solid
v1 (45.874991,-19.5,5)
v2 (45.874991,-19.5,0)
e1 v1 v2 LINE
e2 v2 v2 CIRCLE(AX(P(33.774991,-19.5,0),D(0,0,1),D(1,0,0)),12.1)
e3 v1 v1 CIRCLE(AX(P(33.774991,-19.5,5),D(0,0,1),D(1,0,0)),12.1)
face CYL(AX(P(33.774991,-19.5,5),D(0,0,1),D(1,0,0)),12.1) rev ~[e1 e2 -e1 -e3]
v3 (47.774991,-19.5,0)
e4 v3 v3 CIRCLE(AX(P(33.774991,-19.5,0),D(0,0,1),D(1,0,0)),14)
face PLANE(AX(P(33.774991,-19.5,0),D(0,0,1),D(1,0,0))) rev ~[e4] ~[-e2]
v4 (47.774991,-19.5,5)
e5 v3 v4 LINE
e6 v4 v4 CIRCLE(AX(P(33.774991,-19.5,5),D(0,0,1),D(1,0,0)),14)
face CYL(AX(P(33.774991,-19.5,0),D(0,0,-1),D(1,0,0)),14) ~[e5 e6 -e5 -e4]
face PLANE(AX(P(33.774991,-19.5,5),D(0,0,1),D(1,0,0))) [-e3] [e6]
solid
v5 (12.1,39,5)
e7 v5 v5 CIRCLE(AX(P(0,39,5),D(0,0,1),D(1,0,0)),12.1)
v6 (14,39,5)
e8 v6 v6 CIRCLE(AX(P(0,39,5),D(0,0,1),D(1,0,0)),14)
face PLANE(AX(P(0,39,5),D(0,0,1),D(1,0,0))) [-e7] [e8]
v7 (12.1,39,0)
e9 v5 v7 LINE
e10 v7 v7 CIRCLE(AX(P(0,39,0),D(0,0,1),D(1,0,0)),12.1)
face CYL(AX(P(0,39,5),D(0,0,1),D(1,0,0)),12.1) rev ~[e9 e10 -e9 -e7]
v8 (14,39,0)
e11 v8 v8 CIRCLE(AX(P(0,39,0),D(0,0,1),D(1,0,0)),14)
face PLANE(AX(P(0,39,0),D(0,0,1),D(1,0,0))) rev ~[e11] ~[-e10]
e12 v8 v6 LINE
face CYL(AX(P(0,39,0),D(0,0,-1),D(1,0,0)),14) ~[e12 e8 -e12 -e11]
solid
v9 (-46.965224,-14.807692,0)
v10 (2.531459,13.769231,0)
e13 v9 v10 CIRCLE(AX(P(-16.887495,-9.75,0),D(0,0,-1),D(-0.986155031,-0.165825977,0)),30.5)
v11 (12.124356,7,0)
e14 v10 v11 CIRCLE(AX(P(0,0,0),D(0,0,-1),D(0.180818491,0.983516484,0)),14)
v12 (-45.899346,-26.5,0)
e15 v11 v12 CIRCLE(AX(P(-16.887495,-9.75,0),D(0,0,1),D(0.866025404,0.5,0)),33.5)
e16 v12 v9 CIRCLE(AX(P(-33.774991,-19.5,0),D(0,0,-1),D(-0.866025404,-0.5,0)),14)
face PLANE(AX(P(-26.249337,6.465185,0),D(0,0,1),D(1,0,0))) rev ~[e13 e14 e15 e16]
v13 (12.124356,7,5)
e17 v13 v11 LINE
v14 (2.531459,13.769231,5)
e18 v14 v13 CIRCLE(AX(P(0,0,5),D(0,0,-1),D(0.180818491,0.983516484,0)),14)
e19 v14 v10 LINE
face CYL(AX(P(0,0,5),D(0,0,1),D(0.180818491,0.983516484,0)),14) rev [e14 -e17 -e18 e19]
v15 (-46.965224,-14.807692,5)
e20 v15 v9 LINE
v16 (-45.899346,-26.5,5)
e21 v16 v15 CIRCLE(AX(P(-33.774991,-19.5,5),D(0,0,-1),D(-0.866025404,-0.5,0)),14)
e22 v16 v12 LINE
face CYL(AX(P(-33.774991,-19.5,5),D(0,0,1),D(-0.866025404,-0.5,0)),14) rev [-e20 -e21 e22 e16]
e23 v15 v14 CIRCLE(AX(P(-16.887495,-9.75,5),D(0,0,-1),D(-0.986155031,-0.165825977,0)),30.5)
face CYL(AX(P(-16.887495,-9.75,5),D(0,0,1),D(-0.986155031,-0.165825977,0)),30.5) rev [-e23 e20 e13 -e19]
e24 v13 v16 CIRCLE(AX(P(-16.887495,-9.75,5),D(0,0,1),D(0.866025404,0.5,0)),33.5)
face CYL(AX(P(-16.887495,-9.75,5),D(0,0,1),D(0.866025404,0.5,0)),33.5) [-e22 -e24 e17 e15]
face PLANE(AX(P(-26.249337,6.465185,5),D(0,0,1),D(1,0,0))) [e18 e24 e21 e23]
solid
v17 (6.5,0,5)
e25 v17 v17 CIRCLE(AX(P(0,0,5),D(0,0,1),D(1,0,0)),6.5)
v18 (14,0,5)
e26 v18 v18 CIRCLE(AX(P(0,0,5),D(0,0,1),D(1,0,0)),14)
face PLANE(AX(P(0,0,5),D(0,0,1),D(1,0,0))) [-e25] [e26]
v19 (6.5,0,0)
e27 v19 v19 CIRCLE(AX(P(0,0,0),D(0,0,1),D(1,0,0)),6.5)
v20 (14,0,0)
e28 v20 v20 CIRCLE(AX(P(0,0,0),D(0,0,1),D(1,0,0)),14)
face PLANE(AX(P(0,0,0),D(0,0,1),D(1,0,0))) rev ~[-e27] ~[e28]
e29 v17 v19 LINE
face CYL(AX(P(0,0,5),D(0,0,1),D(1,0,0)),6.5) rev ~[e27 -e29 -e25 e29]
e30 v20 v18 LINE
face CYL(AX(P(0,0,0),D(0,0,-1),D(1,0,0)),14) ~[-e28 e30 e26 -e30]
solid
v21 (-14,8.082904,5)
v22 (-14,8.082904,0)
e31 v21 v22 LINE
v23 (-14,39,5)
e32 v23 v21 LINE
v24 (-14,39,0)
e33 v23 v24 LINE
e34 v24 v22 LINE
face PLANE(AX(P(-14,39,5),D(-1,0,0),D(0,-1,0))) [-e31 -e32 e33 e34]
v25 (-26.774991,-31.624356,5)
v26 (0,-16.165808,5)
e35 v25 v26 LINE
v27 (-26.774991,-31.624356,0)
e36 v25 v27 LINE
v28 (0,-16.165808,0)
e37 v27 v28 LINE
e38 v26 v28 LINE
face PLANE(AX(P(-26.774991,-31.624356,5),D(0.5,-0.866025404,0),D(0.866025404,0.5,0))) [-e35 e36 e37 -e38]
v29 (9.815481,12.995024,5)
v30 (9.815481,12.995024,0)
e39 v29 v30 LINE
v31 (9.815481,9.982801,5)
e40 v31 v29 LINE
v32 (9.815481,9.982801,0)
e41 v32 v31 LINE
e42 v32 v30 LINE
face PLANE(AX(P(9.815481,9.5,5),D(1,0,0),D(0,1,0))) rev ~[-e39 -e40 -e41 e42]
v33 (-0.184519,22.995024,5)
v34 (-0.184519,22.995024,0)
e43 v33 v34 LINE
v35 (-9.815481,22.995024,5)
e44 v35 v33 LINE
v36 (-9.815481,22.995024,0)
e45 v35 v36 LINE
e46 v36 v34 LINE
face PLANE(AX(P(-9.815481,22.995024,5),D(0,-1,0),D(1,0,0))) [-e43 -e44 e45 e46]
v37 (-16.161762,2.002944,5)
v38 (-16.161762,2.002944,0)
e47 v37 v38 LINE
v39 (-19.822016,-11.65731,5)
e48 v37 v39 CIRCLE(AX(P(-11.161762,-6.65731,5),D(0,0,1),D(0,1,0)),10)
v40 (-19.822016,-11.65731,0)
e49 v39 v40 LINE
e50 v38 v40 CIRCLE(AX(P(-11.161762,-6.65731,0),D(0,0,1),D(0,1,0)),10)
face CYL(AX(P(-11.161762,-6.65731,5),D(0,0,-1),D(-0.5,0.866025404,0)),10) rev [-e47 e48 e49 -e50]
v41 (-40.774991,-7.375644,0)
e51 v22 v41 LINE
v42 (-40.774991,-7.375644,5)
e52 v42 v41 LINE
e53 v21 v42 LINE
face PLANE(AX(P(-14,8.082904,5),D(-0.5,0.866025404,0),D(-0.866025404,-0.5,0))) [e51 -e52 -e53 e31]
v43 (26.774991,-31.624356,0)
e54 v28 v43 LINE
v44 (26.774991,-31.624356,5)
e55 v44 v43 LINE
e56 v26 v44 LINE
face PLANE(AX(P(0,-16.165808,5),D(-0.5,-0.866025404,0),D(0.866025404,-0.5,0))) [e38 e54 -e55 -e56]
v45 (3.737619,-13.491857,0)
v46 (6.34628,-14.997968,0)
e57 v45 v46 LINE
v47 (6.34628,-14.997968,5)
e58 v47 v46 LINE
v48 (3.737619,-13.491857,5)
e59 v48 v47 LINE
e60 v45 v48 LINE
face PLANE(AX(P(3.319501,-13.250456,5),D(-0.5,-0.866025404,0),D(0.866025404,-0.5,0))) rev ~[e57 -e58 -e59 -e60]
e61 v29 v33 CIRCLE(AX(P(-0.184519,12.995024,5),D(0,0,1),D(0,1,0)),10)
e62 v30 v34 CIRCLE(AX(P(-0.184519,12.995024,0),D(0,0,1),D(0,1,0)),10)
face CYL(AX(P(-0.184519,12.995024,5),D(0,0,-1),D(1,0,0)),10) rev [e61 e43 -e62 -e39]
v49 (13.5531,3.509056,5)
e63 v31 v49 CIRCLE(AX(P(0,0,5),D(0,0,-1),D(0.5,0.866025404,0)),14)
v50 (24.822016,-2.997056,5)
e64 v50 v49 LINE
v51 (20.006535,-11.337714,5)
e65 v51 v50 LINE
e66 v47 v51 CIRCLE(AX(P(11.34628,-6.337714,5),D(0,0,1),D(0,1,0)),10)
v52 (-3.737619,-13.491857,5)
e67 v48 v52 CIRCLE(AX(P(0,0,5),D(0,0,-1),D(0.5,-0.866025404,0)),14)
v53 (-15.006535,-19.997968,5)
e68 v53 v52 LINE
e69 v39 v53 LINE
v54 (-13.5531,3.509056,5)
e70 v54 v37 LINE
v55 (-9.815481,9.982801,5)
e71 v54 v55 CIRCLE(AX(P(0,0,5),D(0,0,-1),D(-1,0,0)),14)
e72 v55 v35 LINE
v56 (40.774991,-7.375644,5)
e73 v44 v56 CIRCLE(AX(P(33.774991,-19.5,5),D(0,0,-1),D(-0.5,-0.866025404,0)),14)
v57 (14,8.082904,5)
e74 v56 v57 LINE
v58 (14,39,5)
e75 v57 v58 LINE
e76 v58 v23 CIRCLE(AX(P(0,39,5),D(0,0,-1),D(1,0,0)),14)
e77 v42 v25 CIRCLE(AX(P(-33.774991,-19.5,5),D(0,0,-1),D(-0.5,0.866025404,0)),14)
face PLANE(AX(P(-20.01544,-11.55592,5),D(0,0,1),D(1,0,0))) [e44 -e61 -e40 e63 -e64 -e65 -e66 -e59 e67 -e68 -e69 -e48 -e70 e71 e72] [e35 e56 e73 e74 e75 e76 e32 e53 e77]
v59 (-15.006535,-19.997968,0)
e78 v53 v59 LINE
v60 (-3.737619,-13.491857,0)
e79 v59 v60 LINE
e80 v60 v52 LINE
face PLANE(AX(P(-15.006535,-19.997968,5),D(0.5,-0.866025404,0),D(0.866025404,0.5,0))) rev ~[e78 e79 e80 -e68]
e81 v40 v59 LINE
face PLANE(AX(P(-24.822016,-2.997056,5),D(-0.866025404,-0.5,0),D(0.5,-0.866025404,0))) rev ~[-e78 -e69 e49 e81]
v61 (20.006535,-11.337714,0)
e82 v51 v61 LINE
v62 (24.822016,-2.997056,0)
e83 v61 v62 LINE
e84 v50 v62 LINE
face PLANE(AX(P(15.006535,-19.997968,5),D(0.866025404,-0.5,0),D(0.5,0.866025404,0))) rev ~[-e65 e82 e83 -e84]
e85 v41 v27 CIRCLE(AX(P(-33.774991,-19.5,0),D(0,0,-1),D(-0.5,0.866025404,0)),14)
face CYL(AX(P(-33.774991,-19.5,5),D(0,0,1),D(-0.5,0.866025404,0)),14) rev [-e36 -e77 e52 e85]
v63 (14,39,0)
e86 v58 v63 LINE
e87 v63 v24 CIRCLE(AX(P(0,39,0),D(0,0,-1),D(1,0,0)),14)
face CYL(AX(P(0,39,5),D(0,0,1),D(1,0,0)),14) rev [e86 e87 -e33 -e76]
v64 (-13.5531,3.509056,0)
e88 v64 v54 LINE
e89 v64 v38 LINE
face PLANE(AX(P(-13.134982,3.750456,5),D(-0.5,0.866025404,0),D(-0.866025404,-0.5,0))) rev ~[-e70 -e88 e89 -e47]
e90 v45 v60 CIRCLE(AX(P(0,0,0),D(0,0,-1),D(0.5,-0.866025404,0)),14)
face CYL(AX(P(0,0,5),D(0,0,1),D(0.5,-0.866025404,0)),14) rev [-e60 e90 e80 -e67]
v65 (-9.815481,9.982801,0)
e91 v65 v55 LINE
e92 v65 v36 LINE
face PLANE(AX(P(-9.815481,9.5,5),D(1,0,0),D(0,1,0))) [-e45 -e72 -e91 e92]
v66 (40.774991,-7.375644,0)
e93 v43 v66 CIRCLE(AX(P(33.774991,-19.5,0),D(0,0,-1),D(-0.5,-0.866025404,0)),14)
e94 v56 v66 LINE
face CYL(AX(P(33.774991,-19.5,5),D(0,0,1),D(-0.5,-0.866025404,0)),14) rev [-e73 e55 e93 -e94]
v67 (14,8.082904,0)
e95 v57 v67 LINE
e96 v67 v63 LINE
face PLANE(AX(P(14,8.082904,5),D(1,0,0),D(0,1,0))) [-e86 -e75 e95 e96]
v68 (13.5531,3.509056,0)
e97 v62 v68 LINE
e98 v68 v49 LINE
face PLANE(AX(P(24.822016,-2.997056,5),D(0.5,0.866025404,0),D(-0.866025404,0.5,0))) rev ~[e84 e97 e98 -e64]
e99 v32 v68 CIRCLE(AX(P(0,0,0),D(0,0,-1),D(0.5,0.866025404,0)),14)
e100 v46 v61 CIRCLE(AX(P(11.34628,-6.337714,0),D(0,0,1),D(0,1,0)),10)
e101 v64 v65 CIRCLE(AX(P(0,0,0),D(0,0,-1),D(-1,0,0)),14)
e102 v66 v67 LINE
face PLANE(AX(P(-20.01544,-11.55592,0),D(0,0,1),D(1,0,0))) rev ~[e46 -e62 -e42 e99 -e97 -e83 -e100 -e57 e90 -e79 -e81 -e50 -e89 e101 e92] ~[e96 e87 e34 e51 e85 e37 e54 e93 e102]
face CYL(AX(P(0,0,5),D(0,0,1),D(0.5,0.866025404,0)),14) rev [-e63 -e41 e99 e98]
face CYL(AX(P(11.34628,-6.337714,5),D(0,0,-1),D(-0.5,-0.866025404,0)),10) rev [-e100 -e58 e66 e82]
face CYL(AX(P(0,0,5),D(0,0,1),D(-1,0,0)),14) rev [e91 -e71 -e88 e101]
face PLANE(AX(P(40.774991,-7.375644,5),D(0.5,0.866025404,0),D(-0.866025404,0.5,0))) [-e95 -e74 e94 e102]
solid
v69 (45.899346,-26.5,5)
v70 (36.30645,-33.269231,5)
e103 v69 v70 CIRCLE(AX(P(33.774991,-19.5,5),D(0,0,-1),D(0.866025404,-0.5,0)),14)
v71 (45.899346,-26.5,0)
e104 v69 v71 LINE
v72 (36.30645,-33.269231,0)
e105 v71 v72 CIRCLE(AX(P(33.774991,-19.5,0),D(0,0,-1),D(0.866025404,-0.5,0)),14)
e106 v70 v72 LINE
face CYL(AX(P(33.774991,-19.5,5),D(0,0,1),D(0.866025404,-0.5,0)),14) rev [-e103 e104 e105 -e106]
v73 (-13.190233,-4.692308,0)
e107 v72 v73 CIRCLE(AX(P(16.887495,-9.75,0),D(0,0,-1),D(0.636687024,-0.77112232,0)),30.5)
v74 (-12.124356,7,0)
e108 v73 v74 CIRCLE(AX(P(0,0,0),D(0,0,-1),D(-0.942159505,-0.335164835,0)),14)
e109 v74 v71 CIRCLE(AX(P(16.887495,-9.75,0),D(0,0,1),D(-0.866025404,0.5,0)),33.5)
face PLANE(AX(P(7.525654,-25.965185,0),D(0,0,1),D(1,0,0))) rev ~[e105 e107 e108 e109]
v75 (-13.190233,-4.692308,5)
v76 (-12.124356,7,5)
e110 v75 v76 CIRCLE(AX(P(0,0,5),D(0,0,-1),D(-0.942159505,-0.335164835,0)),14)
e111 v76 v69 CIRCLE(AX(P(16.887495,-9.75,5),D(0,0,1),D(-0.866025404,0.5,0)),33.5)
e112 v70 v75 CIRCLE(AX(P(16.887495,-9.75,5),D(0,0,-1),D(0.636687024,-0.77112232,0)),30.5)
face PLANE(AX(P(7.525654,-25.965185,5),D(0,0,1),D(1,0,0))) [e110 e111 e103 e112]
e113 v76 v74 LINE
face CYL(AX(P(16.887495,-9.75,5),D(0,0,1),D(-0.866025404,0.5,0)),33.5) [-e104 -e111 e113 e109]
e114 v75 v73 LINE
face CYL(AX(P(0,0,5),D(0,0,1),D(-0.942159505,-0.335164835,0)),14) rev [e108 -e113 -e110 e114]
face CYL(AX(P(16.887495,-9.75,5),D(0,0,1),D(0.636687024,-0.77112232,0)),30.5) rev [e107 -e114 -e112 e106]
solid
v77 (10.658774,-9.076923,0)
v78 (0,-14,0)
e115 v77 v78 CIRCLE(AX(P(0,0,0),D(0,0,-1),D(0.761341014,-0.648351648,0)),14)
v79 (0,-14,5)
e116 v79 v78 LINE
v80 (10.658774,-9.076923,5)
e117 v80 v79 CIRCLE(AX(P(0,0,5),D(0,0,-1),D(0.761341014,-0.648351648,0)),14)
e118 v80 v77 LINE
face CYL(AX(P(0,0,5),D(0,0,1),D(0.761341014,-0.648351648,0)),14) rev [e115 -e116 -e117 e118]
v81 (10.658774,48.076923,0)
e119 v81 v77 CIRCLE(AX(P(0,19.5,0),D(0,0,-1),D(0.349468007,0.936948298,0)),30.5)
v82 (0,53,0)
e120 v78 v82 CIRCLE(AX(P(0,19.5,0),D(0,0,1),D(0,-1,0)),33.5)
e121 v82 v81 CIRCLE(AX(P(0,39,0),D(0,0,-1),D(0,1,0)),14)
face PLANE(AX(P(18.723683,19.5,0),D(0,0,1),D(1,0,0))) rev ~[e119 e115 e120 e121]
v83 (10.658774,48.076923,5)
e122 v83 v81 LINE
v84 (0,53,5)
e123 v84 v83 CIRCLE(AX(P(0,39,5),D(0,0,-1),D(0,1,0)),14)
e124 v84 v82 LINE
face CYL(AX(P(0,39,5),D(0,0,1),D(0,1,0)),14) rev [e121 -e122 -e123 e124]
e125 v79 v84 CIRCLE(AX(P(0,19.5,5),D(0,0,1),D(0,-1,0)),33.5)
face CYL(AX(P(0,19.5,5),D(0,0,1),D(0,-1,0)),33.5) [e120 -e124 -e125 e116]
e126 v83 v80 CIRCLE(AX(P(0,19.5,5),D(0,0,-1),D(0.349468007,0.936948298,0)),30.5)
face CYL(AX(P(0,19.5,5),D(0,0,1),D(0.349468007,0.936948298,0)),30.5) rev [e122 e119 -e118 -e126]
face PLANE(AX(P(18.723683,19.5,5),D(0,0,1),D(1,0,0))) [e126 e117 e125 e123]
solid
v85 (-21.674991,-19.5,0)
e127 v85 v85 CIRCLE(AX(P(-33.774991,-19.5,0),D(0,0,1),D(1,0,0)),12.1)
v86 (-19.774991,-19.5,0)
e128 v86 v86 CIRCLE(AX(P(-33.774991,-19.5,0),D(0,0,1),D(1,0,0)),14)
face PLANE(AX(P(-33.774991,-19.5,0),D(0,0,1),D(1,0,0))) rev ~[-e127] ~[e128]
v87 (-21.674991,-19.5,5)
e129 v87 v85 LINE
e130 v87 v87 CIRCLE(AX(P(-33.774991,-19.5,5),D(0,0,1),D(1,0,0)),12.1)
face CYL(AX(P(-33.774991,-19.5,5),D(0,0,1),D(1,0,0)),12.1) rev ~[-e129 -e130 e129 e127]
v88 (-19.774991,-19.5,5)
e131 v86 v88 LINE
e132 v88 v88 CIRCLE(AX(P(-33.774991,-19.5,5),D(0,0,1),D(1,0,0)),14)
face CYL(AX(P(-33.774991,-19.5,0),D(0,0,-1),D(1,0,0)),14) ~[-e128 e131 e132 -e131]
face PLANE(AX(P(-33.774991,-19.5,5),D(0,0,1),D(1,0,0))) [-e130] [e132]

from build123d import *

# Parameters (mm, degrees)
F0_R      = 14
F1_DEPTH  = 5
F2_R      = 6.5
F3_DEPTH  = 5
F4_R      = 14
F5_DEPTH  = 5
F6_R      = 12.1
F7_DEPTH  = 5
F9_DEPTH  = 5
F11_DEPTH = 5
F12_W     = 19.6309629187
F12_H     = 13.4950243425
F13_DEPTH = 25
F14_R     = 10


# Not quite as in the source:
# - a feature names something its author has since deleted; it is built from what else it names


with BuildPart() as f1:
    # F0 (on Top) → F1 (new body)
    with BuildSketch(Plane.XY):
        Circle(F0_R)
    extrude(amount=F1_DEPTH)

    # F2 (on face) → F3 (cut)
    with BuildSketch(Plane.XY.offset(5)):
        Circle(F2_R)
    extrude(amount=-F3_DEPTH, mode=Mode.SUBTRACT)


with BuildPart() as f5:
    # F4 (on Top) → F5 (new body)
    with BuildSketch(Plane.XY):
        with Locations((0, 39)):
            Circle(F4_R)
    extrude(amount=F5_DEPTH)


with BuildPart() as f5b:
    # F4 (on Top) → F5, piece 2 (new body)
    with BuildSketch(Plane.XY):
        with Locations((-33.7749907476, -19.5)):
            Circle(F4_R)
    extrude(amount=F5_DEPTH)


with BuildPart() as f5c:
    # F4 (on Top) → F5, piece 3 (new body)
    with BuildSketch(Plane.XY):
        with Locations((33.7749907476, -19.5)):
            Circle(F4_R)
    extrude(amount=F5_DEPTH)


with BuildPart() as f7_tool:
    # F6 (on face) → F7 (new body)
    with BuildSketch(Plane.XY.offset(5)):
        with Locations((0, 39)):
            Circle(F6_R)
        with Locations((-33.7749907476, -19.5)):
            Circle(F6_R)
        with Locations((33.7749907476, -19.5)):
            Circle(F6_R)
    extrude(amount=-F7_DEPTH)


with BuildPart() as f5_1:
    add(f5.part)

    # F7: cut by f7_tool
    add(f7_tool.part, mode=Mode.SUBTRACT)


with BuildPart() as f5b_1:
    add(f5b.part)

    # F7: cut by f7_tool
    add(f7_tool.part, mode=Mode.SUBTRACT)


with BuildPart() as f5c_1:
    add(f5c.part)

    # F7: cut by f7_tool
    add(f7_tool.part, mode=Mode.SUBTRACT)


with BuildPart() as f9:
    # F8 (on face) → F9 (new body)
    with BuildSketch(Plane.XY.offset(5)):
        with BuildLine():
            ThreePointArc((10.6587742004, -9.0769230769), (5.8703950856, -12.709778186), (0, -14))
            ThreePointArc((0, -14), (33.5, 19.5), (0, 53))
            ThreePointArc((0, 53), (5.8703950856, 51.709778186), (10.6587742004, 48.0769230769))
            ThreePointArc((10.6587742004, 48.0769230769), (30.5, 19.5), (10.6587742004, -9.0769230769))
        make_face()
    extrude(amount=-F9_DEPTH)


with BuildPart() as f9b:
    # F8 (on face) → F9, piece 2 (new body)
    with BuildSketch(Plane.XY.offset(5)):
        with BuildLine():
            ThreePointArc((2.5314588726, 13.7692307692), (8.0717932428, 11.4388003674), (12.124355653, 7))
            ThreePointArc((12.124355653, 7), (-33.6374953738, 19.2618510268), (-45.8993464006, -26.5))
            ThreePointArc((-45.8993464006, -26.5), (-47.717179076, -20.7709778186), (-46.9652238206, -14.8076923077))
            ThreePointArc((-46.9652238206, -14.8076923077), (-32.1374953738, 16.6637748154), (2.5314588726, 13.7692307692))
        make_face()
    extrude(amount=-F9_DEPTH)


with BuildPart() as f9c:
    # F8 (on face) → F9, piece 3 (new body)
    with BuildSketch(Plane.XY.offset(5)):
        with BuildLine():
            ThreePointArc((-13.190233073, -4.6923076923), (-13.9421883284, 1.2709778186), (-12.124355653, 7))
            ThreePointArc((-12.124355653, 7), (0.1374953738, -38.7618510268), (45.8993464006, -26.5))
            ThreePointArc((45.8993464006, -26.5), (41.8467839904, -30.9388003674), (36.3064496202, -33.2692307692))
            ThreePointArc((36.3064496202, -33.2692307692), (1.6374953738, -36.1637748154), (-13.190233073, -4.6923076923))
        make_face()
    extrude(amount=-F9_DEPTH)


with BuildPart() as f11:
    # F10 (on face) → F11 (new body)
    with BuildSketch(Plane.XY.offset(5)):
        with BuildLine():
            ThreePointArc((-7, -12.124355653), (-12.124355653, -7), (-14, 0))
            Line((-14, 0), (-14, 8.0829037687))
            Line((-14, 8.0829037687), (-40.7749907476, -7.375644347))
            ThreePointArc((-40.7749907476, -7.375644347), (-21.6506350946, -12.5), (-26.7749907476, -31.624355653))
            Line((-26.7749907476, -31.624355653), (0, -16.1658075373))
            Line((0, -16.1658075373), (-7, -12.124355653))
        make_face()
        with BuildLine():
            Line((-14, 8.0829037687), (-14, 0))
            ThreePointArc((-14, 0), (-12.124355653, 7), (-7, 12.124355653))
            Line((-7, 12.124355653), (-14, 8.0829037687))
        make_face()
        with BuildLine():
            Line((-14, 39), (-14, 8.0829037687))
            Line((-14, 8.0829037687), (-7, 12.124355653))
            ThreePointArc((-7, 12.124355653), (0, 14), (7, 12.124355653))
            Line((7, 12.124355653), (14, 8.0829037687))
            Line((14, 8.0829037687), (14, 39))
            ThreePointArc((14, 39), (0, 25), (-14, 39))
        make_face()
        with BuildLine():
            ThreePointArc((7, -12.124355653), (0, -14), (-7, -12.124355653))
            Line((-7, -12.124355653), (0, -16.1658075373))
            Line((0, -16.1658075373), (7, -12.124355653))
        make_face()
        with BuildLine():
            Line((14, 8.0829037687), (7, 12.124355653))
            ThreePointArc((7, 12.124355653), (12.124355653, 7), (14, 0))
            Line((14, 0), (14, 8.0829037687))
        make_face()
        with BuildLine():
            ThreePointArc((14, 0), (12.124355653, -7), (7, -12.124355653))
            Line((7, -12.124355653), (0, -16.1658075373))
            Line((0, -16.1658075373), (26.7749907476, -31.624355653))
            ThreePointArc((26.7749907476, -31.624355653), (21.6506350946, -12.5), (40.7749907476, -7.375644347))
            Line((40.7749907476, -7.375644347), (14, 8.0829037687))
            Line((14, 8.0829037687), (14, 0))
        make_face()
    extrude(amount=-F11_DEPTH)

    # F12 (on face) → F13 (cut)
    with BuildSketch(Plane.XY.offset(5)):
        with Locations((0, 16.2475121713)):
            Rectangle(F12_W, F12_H)
        Polygon((-3.3195006063, -13.2504562942), (-13.1349820656, 3.7504562942), (-24.822015971, -2.9970558771), (-15.0065345116, -19.9979684655), align=None)
        Polygon((13.1349820656, 3.7504562942), (3.3195006063, -13.2504562942), (15.0065345116, -19.9979684655), (24.822015971, -2.9970558771), align=None)
    extrude(amount=-F13_DEPTH, mode=Mode.SUBTRACT)

    # F14
    f14_edges = [f11.edges().sort_by_distance(p)[0] for p in [
        (9.815481, 22.995024, 2.5),
        (15.006535, -19.997968, 2.5),
        (-24.822016, -2.997056, 2.5),
    ]]
    fillet(f14_edges, radius=F14_R)


solid = Compound([f1.part, f5_1.part, f5b_1.part, f5c_1.part, f9.part, f9b.part, f9c.part, f11.part])
